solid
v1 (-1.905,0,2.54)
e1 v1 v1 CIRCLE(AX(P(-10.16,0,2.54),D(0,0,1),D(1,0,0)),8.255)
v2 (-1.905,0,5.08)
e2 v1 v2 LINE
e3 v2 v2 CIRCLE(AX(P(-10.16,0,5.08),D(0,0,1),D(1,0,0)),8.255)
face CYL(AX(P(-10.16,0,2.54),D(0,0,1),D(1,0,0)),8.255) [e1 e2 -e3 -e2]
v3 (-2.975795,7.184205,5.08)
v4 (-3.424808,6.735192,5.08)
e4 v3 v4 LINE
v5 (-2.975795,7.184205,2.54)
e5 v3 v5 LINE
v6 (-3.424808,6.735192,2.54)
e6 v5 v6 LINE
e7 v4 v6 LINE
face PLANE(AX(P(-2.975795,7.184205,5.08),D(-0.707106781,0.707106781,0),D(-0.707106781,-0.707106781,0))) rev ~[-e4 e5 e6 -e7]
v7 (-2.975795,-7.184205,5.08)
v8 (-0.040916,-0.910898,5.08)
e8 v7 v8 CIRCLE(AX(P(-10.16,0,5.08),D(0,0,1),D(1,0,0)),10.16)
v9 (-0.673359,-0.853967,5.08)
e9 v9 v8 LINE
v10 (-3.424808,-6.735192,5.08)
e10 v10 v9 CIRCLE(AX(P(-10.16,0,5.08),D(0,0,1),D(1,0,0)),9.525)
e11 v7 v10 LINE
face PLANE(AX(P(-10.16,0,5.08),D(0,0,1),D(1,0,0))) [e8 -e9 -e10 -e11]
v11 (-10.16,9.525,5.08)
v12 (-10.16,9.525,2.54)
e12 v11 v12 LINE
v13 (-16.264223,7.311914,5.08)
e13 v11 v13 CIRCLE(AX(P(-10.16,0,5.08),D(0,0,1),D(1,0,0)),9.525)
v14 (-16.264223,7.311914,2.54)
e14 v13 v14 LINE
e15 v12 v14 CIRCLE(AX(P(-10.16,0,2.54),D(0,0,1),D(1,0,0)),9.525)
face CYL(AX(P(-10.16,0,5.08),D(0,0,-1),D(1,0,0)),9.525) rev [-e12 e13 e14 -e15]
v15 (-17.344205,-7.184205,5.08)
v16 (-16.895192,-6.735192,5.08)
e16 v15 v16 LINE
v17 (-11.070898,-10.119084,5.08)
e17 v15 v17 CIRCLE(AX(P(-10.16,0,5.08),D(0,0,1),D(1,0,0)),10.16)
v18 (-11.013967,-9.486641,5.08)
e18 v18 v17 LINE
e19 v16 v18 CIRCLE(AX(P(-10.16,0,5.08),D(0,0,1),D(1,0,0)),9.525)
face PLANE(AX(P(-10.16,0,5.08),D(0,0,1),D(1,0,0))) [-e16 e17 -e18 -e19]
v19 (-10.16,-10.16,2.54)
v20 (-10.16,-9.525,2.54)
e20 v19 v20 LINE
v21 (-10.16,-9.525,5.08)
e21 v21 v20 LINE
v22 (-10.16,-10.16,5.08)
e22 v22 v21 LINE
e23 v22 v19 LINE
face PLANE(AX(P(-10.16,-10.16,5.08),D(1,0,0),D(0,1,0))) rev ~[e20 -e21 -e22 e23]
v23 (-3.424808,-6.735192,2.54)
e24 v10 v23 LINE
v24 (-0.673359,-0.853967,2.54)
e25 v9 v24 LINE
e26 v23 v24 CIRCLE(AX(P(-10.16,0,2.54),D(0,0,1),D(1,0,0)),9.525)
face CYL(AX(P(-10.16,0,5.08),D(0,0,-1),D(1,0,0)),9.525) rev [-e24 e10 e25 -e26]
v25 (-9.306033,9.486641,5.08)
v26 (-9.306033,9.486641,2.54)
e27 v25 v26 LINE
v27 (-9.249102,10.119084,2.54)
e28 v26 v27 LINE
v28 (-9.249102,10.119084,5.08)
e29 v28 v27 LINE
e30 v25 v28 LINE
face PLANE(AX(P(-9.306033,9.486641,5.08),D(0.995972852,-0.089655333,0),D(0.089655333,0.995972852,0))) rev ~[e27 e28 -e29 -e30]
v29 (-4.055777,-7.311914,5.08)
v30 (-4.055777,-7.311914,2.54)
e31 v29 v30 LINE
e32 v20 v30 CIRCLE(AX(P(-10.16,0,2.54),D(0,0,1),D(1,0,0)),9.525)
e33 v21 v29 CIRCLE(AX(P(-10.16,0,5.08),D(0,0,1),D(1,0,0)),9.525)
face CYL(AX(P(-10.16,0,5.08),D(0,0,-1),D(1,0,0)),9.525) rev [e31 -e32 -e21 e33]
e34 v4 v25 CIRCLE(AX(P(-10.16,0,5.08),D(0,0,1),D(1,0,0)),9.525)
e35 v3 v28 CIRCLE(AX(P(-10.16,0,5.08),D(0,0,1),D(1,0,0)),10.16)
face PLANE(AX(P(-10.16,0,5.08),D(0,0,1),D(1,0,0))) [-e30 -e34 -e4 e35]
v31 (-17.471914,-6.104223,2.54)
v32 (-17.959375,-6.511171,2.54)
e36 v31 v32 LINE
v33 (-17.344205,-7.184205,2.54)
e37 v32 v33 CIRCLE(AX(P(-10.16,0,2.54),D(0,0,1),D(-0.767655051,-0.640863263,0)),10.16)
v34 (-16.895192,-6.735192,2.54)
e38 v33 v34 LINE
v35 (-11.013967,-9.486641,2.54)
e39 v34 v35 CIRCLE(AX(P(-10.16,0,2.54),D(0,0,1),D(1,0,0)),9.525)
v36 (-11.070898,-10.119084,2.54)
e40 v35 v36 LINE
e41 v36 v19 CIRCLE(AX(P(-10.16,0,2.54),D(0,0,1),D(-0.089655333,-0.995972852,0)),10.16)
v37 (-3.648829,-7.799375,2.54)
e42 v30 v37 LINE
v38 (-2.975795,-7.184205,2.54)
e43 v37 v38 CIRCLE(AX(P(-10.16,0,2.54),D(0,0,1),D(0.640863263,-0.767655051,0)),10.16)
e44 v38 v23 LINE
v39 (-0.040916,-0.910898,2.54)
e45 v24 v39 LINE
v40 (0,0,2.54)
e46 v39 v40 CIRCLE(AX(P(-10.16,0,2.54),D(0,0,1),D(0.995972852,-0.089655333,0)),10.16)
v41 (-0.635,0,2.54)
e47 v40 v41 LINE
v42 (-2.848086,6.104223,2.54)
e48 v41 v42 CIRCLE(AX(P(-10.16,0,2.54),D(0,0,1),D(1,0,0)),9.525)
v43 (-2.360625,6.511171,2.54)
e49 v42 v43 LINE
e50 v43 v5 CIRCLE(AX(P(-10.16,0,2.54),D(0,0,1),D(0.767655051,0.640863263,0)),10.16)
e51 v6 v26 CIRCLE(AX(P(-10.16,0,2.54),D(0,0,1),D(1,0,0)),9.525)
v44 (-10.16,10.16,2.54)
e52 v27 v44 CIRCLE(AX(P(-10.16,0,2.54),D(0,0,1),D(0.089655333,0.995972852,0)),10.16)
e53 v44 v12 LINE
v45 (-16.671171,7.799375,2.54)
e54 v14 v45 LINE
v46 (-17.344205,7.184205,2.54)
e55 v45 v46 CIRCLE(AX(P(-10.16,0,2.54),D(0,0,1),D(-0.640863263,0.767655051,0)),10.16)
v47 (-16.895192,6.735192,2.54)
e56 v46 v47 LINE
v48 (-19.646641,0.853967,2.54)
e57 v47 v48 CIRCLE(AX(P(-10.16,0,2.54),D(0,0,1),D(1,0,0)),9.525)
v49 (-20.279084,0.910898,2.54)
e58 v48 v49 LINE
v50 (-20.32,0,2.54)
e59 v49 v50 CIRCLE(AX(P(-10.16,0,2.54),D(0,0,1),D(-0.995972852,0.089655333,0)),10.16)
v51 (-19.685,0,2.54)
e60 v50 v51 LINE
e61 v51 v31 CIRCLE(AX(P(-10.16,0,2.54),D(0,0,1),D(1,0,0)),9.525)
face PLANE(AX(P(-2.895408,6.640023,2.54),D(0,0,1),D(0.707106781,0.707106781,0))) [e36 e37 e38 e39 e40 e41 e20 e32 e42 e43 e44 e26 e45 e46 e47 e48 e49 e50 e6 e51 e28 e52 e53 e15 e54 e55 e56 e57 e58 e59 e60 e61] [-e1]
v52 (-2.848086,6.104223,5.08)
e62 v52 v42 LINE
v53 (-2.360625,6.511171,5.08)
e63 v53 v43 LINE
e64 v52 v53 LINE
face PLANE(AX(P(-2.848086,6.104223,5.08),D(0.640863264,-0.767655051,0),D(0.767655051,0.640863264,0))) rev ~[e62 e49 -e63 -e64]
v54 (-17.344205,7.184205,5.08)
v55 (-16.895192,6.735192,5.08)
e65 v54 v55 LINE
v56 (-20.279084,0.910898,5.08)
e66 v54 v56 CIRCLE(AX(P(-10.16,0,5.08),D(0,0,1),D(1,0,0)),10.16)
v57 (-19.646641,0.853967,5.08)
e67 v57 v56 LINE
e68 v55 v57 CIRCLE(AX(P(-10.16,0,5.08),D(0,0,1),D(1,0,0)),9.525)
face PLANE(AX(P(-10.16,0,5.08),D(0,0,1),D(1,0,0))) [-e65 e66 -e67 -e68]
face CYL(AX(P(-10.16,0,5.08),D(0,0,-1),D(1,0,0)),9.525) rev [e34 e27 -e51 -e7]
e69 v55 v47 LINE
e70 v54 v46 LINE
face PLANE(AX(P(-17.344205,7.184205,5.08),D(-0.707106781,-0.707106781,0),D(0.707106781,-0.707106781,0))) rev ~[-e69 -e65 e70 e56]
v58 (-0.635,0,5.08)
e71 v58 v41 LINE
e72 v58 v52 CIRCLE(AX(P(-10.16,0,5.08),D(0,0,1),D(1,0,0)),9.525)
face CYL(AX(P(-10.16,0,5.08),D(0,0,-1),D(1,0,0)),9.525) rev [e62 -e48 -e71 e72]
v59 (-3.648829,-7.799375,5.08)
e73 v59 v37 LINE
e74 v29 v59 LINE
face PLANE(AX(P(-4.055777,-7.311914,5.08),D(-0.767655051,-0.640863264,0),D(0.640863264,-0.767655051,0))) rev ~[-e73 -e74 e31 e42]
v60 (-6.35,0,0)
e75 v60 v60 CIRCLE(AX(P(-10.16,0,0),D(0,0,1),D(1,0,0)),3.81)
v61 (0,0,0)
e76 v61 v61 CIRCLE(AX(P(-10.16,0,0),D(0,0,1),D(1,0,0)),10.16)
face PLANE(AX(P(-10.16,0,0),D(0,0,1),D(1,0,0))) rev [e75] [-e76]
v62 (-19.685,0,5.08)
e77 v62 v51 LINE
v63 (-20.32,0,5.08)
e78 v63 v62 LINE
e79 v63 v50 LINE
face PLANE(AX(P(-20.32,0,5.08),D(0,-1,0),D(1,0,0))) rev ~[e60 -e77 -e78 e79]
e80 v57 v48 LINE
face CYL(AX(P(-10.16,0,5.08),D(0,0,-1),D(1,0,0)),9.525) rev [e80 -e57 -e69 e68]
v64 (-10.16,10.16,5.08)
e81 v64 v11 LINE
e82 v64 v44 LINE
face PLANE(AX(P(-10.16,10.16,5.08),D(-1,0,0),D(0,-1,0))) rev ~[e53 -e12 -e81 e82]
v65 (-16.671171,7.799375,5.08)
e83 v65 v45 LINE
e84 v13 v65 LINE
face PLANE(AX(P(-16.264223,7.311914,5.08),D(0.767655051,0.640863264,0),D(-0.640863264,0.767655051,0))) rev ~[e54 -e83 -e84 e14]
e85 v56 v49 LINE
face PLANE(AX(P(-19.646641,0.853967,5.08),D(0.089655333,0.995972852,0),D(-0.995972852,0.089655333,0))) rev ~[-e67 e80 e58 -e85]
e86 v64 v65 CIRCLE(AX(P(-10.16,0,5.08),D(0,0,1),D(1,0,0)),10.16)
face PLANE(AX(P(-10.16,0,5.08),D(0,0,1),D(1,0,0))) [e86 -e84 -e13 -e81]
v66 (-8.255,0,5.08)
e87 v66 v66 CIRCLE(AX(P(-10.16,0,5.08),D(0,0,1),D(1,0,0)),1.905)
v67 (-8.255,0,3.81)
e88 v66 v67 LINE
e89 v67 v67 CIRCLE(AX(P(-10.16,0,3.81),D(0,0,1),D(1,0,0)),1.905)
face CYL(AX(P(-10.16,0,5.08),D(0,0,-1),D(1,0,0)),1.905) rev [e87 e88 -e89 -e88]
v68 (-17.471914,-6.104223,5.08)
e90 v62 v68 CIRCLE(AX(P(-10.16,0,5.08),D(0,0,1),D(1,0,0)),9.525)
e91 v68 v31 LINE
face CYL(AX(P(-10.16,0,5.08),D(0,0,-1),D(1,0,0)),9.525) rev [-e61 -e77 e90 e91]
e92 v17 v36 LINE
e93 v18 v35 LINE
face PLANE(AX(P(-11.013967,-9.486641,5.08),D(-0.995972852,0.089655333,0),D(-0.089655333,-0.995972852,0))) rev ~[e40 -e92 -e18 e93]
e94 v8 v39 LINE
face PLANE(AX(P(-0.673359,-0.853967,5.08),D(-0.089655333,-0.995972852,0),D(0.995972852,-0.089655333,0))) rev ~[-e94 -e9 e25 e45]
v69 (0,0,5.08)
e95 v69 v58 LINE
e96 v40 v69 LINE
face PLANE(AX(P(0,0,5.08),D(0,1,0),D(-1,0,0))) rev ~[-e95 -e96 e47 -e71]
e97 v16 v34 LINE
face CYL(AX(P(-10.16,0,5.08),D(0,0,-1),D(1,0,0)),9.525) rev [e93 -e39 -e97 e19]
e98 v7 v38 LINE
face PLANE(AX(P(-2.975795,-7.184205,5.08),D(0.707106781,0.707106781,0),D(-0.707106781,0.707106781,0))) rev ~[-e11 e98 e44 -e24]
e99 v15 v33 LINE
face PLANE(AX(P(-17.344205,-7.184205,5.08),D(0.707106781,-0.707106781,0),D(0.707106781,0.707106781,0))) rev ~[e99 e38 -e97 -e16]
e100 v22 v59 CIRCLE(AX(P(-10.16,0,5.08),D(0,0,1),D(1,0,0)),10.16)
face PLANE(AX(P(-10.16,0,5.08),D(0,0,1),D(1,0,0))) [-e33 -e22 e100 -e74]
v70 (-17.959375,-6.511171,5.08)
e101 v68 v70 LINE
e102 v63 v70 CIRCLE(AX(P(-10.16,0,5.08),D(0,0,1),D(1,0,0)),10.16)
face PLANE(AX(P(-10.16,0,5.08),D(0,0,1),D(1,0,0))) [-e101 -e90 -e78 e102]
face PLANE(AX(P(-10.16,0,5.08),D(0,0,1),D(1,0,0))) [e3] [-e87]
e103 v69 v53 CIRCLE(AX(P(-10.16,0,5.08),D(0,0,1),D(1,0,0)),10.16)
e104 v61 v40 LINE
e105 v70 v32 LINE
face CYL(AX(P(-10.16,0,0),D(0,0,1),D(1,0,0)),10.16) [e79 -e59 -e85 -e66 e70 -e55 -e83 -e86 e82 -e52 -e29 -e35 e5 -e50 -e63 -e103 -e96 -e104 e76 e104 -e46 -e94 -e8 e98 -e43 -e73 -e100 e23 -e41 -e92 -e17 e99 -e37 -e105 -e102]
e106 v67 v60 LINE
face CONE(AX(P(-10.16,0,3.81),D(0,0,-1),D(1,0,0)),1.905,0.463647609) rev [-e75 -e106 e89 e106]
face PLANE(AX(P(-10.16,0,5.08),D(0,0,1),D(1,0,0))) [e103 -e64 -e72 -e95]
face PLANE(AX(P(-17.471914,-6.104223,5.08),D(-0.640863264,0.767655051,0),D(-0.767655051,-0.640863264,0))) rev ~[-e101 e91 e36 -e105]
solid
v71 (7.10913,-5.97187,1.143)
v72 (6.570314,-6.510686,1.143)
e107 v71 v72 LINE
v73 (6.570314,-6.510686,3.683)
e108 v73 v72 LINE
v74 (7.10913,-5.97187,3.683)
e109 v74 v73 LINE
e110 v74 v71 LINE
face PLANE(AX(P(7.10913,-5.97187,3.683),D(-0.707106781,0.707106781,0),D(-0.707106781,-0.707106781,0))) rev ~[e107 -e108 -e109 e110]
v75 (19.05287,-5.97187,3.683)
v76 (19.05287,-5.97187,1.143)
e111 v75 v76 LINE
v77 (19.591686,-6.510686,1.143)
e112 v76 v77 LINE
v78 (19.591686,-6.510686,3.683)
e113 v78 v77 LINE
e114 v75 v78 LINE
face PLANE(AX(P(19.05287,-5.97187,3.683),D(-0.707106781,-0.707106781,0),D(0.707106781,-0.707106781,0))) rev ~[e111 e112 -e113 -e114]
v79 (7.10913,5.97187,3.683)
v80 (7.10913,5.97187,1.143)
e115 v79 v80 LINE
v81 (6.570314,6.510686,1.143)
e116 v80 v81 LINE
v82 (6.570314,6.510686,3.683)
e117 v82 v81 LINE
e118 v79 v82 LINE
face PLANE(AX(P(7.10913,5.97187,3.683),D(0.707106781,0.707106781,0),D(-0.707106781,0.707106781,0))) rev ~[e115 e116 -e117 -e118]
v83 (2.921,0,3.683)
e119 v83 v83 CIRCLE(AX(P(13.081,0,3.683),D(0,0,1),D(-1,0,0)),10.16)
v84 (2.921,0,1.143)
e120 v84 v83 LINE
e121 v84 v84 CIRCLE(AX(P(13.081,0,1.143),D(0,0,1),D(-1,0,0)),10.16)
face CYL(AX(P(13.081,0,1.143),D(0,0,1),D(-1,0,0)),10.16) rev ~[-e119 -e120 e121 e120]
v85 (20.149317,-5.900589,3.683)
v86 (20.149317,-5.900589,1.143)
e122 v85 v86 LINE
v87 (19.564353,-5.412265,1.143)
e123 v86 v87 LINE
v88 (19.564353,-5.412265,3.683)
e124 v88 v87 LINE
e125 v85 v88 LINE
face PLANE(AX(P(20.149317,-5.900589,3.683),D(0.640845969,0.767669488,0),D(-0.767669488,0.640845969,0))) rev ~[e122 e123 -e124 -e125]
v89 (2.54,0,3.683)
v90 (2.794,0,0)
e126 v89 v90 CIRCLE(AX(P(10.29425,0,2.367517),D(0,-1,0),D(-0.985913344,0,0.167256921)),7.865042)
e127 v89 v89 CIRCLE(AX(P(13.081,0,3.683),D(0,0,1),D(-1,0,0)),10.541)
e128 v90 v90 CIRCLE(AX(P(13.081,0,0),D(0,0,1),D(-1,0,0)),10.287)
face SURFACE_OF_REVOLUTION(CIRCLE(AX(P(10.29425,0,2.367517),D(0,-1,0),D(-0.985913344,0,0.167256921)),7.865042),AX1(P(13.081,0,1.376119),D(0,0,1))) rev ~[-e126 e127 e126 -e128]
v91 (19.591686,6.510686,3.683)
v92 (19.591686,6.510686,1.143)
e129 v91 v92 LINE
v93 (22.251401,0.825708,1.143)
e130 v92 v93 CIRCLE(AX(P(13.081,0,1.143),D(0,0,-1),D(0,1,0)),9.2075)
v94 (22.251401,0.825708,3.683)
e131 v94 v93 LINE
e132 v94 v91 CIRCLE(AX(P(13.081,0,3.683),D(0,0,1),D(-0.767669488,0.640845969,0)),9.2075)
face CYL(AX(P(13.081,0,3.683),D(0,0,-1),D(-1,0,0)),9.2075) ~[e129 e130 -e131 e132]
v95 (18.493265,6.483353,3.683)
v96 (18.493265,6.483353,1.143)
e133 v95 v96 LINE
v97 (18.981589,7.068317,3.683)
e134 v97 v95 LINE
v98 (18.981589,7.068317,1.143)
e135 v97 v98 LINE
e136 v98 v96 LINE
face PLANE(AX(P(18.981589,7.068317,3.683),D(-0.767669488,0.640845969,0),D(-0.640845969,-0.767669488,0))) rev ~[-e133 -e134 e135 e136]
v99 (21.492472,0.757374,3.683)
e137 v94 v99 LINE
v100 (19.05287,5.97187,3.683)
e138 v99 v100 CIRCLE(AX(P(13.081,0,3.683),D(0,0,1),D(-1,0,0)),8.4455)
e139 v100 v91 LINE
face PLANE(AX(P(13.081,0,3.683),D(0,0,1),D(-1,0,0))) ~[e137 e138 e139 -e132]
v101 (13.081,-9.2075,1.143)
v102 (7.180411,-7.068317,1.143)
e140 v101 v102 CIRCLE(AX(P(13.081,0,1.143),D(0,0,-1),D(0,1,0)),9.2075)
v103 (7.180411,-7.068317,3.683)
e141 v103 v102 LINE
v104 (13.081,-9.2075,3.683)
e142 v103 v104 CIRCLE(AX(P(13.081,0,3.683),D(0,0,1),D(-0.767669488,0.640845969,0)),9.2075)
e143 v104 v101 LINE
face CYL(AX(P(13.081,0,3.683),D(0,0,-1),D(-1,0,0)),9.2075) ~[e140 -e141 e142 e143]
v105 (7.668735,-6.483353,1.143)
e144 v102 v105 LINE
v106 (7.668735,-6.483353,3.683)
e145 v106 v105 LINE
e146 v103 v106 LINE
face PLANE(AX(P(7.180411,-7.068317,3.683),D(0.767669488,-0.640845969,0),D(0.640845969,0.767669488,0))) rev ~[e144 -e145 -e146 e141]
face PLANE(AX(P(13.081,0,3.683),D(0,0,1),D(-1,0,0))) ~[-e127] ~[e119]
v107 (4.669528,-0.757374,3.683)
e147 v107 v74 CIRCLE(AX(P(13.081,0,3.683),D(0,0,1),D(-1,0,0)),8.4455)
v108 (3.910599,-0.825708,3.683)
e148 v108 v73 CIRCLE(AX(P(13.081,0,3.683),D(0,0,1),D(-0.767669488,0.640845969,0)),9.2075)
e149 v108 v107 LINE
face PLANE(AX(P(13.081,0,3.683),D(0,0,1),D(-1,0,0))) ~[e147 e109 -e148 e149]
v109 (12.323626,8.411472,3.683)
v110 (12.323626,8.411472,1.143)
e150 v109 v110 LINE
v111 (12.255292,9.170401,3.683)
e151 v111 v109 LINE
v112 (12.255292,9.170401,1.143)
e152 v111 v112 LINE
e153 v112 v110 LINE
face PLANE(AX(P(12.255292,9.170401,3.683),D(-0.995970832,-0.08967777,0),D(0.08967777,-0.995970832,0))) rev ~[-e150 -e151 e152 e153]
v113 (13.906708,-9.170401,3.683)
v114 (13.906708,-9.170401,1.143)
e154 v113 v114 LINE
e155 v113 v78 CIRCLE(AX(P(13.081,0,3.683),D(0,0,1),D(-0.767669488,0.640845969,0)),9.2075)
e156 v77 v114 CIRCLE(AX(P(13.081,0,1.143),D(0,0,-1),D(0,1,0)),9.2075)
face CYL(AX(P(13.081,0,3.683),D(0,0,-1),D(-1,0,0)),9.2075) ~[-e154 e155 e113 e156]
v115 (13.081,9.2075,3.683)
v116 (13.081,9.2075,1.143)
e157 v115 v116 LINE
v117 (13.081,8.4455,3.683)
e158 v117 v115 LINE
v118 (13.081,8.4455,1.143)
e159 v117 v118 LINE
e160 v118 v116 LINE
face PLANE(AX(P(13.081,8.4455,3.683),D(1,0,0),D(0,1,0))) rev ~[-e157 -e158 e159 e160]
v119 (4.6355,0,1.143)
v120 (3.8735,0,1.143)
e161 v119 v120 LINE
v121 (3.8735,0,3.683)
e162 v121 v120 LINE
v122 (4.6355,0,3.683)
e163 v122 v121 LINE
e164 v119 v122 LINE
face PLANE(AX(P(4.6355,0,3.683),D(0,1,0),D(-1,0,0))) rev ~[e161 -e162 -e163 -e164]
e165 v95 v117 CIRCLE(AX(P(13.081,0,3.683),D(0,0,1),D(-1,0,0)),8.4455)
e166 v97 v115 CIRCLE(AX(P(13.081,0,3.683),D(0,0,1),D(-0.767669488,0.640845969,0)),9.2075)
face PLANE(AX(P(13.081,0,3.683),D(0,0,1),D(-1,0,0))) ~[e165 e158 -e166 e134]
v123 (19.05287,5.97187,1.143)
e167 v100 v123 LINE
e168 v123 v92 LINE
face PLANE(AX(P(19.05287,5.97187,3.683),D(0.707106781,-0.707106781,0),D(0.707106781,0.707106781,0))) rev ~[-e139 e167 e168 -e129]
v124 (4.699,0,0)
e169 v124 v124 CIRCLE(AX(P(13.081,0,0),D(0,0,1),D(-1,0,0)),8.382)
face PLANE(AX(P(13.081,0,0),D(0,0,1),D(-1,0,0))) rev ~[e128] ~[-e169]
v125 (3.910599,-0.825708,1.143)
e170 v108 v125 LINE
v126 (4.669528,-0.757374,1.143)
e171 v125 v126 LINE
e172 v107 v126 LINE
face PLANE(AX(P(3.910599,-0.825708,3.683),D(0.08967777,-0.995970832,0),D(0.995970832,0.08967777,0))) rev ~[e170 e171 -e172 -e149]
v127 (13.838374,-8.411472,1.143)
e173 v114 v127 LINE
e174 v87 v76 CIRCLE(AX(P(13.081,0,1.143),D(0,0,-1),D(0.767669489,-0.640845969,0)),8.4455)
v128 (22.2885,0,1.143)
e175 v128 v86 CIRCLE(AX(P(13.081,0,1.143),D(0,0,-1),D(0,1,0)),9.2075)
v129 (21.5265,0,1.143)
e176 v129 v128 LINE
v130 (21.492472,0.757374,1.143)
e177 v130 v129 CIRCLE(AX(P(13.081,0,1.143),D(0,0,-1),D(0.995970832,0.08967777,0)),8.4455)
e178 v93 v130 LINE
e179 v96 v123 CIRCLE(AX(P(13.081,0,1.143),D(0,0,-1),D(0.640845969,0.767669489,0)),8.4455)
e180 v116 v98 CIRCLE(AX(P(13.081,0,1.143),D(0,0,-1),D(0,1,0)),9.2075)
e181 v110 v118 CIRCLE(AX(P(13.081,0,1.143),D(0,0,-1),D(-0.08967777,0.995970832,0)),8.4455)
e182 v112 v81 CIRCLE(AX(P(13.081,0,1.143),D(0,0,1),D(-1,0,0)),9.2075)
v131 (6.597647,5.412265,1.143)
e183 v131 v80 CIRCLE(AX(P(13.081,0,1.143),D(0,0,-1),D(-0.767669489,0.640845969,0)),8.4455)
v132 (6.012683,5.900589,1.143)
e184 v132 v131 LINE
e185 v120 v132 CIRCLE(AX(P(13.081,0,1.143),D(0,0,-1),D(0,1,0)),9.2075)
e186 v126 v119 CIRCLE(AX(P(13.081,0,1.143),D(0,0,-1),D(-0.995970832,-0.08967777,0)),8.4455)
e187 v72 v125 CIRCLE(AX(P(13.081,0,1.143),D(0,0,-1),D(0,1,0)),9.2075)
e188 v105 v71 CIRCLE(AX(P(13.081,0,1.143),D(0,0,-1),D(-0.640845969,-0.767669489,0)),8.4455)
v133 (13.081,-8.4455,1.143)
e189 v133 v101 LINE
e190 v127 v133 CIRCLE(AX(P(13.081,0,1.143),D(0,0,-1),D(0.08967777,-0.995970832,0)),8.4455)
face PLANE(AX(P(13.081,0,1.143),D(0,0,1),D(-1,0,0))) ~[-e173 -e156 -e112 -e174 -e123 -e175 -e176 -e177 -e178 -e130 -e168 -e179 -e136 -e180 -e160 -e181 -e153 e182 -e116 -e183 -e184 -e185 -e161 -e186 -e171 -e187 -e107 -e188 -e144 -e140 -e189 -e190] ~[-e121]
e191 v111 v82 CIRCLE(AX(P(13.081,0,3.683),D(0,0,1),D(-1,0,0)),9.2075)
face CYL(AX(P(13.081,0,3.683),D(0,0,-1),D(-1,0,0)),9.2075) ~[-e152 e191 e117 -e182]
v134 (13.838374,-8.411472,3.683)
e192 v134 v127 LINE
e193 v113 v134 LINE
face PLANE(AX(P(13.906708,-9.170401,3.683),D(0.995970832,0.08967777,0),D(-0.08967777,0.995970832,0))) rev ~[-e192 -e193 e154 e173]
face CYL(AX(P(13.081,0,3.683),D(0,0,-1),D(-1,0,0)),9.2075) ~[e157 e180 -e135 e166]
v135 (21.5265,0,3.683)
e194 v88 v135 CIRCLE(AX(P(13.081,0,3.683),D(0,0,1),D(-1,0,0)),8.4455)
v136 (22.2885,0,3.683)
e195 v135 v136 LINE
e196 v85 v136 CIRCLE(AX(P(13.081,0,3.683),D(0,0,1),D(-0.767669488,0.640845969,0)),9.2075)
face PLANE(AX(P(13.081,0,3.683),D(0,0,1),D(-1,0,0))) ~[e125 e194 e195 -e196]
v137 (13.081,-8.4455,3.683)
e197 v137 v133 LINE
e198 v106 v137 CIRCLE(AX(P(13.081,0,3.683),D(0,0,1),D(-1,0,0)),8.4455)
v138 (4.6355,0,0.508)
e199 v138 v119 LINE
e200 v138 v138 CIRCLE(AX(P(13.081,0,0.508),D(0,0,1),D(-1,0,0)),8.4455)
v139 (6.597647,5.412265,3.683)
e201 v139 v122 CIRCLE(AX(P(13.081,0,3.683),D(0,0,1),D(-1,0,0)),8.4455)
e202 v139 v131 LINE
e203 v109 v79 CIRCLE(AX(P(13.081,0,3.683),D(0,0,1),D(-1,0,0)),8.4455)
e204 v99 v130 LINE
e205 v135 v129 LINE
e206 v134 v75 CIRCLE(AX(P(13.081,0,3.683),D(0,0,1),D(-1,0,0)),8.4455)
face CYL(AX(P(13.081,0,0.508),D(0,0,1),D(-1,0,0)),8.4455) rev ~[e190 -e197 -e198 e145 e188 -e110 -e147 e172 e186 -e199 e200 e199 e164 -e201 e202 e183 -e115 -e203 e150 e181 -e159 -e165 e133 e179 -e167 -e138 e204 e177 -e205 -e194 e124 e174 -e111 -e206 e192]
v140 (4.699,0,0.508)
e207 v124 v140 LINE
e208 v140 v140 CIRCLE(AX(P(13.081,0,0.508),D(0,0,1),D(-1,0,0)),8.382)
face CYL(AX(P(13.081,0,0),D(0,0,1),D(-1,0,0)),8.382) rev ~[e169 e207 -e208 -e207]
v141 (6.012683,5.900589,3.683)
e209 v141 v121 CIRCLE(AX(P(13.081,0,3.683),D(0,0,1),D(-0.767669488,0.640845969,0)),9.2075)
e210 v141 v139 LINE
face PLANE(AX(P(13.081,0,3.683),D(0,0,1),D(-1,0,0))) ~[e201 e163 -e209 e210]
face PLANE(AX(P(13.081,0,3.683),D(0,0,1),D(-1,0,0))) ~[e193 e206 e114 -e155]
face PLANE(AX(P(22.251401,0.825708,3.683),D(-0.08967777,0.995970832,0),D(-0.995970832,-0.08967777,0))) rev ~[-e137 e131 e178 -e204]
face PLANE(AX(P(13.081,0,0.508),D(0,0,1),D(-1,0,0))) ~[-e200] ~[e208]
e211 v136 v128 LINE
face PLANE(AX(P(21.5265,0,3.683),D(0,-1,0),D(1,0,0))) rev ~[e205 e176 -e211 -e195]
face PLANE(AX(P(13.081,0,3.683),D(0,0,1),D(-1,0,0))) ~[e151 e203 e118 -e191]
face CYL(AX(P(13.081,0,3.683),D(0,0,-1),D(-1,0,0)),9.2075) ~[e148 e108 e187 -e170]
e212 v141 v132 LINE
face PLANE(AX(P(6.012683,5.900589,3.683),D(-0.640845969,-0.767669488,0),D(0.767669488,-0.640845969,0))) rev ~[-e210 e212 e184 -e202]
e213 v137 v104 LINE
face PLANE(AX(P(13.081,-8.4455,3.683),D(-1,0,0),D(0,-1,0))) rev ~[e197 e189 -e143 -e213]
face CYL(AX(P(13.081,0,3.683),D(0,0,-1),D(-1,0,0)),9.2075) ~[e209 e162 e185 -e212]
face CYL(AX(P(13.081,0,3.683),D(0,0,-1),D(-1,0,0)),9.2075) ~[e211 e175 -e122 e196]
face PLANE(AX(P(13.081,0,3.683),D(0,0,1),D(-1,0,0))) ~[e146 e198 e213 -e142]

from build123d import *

# Parameters (mm, degrees)
F3_DEPTH        = 2.54
F3_COPIES_COUNT = 8
F7_DEPTH        = 2.54
F7_COPIES_COUNT = 8


# Not quite as in the source:
# - a pattern or mirror of a feature is missing from the dataset's text; its kind, count and spacing are read off the source's solid


with BuildPart() as f1:
    # F0 (on Front) → F1 (revolve)
    with BuildSketch(Plane.XZ):
        Polygon((-6.35, 0), (0, 0), (0, 5.08), (-0.635, 5.08), (-0.635, 2.54), (-1.905, 2.54), (-1.905, 5.08), (-8.255, 5.08), (-8.255, 3.81), align=None)
    revolve(axis=Axis((-10.16, 0, 2.5961052161), (0, 0, 1)))

    # F2 (on face) → F3 (cut, through all)
    with BuildSketch(Plane.XY.offset(5.08)):
        with BuildLine():
            ThreePointArc((-0.635, 0), (-0.6445944791, -0.4274140533), (-0.6733585875, -0.853967043))
            Line((-0.6733585875, -0.853967043), (-0.0409158267, -0.9108981792))
            ThreePointArc((-0.0409158267, -0.9108981792), (-0.010234111, -0.4559083235), (0, 0))
            Line((0, 0), (-0.635, 0))
        make_face()
    f3 = extrude(amount=-F3_DEPTH, mode=Mode.SUBTRACT)

    # F3_copies: F3 ×8 about axis
    f3_copies_axis = Axis((-10.16, 0, 0), (0, 0, 1))
    for i in range(1, F3_COPIES_COUNT):
        add(f3.rotate(f3_copies_axis, i * 360 / F3_COPIES_COUNT), mode=Mode.SUBTRACT)


with BuildPart() as f5:
    # F4 (on Front) → F5 (revolve)
    with BuildSketch(Plane.XZ):
        with BuildLine():
            Line((2.794, 0), (4.699, 0))
            Line((4.699, 0), (4.699, 0.508))
            Line((4.699, 0.508), (4.6355, 0.508))
            Line((4.6355, 0.508), (4.6355, 3.683))
            Line((4.6355, 3.683), (3.8735, 3.683))
            Line((3.8735, 3.683), (3.8735, 1.143))
            Line((3.8735, 1.143), (2.921, 1.143))
            Line((2.921, 1.143), (2.921, 3.683))
            Line((2.921, 3.683), (2.54, 3.683))
            ThreePointArc((2.54, 3.683), (2.4478454241, 1.8263858913), (2.794, 0))
        make_face()
    revolve(axis=Axis((13.081, 0, 1.3761192095), (0, 0, 1)))

    # F6 (on face) → F7 (cut, through all)
    with BuildSketch(Plane.XY.offset(3.683)):
        with BuildLine():
            ThreePointArc((12.3236263902, 8.4114716587), (12.7019311696, 8.4369886258), (13.081, 8.4455))
            Line((13.081, 8.4455), (13.081, 9.2075))
            ThreePointArc((13.081, 9.2075), (12.6677294706, 9.1982206823), (12.2552919292, 9.1704014324))
            Line((12.2552919292, 9.1704014324), (12.3236263902, 8.4114716587))
        make_face()
    f7 = extrude(amount=-F7_DEPTH, mode=Mode.SUBTRACT)

    # F7_copies: F7 ×8 about axis
    f7_copies_axis = Axis((13.081, 0, 0), (0, 0, 1))
    for i in range(1, F7_COPIES_COUNT):
        add(f7.rotate(f7_copies_axis, i * 360 / F7_COPIES_COUNT), mode=Mode.SUBTRACT)


solid = Compound([f1.part, f5.part])
